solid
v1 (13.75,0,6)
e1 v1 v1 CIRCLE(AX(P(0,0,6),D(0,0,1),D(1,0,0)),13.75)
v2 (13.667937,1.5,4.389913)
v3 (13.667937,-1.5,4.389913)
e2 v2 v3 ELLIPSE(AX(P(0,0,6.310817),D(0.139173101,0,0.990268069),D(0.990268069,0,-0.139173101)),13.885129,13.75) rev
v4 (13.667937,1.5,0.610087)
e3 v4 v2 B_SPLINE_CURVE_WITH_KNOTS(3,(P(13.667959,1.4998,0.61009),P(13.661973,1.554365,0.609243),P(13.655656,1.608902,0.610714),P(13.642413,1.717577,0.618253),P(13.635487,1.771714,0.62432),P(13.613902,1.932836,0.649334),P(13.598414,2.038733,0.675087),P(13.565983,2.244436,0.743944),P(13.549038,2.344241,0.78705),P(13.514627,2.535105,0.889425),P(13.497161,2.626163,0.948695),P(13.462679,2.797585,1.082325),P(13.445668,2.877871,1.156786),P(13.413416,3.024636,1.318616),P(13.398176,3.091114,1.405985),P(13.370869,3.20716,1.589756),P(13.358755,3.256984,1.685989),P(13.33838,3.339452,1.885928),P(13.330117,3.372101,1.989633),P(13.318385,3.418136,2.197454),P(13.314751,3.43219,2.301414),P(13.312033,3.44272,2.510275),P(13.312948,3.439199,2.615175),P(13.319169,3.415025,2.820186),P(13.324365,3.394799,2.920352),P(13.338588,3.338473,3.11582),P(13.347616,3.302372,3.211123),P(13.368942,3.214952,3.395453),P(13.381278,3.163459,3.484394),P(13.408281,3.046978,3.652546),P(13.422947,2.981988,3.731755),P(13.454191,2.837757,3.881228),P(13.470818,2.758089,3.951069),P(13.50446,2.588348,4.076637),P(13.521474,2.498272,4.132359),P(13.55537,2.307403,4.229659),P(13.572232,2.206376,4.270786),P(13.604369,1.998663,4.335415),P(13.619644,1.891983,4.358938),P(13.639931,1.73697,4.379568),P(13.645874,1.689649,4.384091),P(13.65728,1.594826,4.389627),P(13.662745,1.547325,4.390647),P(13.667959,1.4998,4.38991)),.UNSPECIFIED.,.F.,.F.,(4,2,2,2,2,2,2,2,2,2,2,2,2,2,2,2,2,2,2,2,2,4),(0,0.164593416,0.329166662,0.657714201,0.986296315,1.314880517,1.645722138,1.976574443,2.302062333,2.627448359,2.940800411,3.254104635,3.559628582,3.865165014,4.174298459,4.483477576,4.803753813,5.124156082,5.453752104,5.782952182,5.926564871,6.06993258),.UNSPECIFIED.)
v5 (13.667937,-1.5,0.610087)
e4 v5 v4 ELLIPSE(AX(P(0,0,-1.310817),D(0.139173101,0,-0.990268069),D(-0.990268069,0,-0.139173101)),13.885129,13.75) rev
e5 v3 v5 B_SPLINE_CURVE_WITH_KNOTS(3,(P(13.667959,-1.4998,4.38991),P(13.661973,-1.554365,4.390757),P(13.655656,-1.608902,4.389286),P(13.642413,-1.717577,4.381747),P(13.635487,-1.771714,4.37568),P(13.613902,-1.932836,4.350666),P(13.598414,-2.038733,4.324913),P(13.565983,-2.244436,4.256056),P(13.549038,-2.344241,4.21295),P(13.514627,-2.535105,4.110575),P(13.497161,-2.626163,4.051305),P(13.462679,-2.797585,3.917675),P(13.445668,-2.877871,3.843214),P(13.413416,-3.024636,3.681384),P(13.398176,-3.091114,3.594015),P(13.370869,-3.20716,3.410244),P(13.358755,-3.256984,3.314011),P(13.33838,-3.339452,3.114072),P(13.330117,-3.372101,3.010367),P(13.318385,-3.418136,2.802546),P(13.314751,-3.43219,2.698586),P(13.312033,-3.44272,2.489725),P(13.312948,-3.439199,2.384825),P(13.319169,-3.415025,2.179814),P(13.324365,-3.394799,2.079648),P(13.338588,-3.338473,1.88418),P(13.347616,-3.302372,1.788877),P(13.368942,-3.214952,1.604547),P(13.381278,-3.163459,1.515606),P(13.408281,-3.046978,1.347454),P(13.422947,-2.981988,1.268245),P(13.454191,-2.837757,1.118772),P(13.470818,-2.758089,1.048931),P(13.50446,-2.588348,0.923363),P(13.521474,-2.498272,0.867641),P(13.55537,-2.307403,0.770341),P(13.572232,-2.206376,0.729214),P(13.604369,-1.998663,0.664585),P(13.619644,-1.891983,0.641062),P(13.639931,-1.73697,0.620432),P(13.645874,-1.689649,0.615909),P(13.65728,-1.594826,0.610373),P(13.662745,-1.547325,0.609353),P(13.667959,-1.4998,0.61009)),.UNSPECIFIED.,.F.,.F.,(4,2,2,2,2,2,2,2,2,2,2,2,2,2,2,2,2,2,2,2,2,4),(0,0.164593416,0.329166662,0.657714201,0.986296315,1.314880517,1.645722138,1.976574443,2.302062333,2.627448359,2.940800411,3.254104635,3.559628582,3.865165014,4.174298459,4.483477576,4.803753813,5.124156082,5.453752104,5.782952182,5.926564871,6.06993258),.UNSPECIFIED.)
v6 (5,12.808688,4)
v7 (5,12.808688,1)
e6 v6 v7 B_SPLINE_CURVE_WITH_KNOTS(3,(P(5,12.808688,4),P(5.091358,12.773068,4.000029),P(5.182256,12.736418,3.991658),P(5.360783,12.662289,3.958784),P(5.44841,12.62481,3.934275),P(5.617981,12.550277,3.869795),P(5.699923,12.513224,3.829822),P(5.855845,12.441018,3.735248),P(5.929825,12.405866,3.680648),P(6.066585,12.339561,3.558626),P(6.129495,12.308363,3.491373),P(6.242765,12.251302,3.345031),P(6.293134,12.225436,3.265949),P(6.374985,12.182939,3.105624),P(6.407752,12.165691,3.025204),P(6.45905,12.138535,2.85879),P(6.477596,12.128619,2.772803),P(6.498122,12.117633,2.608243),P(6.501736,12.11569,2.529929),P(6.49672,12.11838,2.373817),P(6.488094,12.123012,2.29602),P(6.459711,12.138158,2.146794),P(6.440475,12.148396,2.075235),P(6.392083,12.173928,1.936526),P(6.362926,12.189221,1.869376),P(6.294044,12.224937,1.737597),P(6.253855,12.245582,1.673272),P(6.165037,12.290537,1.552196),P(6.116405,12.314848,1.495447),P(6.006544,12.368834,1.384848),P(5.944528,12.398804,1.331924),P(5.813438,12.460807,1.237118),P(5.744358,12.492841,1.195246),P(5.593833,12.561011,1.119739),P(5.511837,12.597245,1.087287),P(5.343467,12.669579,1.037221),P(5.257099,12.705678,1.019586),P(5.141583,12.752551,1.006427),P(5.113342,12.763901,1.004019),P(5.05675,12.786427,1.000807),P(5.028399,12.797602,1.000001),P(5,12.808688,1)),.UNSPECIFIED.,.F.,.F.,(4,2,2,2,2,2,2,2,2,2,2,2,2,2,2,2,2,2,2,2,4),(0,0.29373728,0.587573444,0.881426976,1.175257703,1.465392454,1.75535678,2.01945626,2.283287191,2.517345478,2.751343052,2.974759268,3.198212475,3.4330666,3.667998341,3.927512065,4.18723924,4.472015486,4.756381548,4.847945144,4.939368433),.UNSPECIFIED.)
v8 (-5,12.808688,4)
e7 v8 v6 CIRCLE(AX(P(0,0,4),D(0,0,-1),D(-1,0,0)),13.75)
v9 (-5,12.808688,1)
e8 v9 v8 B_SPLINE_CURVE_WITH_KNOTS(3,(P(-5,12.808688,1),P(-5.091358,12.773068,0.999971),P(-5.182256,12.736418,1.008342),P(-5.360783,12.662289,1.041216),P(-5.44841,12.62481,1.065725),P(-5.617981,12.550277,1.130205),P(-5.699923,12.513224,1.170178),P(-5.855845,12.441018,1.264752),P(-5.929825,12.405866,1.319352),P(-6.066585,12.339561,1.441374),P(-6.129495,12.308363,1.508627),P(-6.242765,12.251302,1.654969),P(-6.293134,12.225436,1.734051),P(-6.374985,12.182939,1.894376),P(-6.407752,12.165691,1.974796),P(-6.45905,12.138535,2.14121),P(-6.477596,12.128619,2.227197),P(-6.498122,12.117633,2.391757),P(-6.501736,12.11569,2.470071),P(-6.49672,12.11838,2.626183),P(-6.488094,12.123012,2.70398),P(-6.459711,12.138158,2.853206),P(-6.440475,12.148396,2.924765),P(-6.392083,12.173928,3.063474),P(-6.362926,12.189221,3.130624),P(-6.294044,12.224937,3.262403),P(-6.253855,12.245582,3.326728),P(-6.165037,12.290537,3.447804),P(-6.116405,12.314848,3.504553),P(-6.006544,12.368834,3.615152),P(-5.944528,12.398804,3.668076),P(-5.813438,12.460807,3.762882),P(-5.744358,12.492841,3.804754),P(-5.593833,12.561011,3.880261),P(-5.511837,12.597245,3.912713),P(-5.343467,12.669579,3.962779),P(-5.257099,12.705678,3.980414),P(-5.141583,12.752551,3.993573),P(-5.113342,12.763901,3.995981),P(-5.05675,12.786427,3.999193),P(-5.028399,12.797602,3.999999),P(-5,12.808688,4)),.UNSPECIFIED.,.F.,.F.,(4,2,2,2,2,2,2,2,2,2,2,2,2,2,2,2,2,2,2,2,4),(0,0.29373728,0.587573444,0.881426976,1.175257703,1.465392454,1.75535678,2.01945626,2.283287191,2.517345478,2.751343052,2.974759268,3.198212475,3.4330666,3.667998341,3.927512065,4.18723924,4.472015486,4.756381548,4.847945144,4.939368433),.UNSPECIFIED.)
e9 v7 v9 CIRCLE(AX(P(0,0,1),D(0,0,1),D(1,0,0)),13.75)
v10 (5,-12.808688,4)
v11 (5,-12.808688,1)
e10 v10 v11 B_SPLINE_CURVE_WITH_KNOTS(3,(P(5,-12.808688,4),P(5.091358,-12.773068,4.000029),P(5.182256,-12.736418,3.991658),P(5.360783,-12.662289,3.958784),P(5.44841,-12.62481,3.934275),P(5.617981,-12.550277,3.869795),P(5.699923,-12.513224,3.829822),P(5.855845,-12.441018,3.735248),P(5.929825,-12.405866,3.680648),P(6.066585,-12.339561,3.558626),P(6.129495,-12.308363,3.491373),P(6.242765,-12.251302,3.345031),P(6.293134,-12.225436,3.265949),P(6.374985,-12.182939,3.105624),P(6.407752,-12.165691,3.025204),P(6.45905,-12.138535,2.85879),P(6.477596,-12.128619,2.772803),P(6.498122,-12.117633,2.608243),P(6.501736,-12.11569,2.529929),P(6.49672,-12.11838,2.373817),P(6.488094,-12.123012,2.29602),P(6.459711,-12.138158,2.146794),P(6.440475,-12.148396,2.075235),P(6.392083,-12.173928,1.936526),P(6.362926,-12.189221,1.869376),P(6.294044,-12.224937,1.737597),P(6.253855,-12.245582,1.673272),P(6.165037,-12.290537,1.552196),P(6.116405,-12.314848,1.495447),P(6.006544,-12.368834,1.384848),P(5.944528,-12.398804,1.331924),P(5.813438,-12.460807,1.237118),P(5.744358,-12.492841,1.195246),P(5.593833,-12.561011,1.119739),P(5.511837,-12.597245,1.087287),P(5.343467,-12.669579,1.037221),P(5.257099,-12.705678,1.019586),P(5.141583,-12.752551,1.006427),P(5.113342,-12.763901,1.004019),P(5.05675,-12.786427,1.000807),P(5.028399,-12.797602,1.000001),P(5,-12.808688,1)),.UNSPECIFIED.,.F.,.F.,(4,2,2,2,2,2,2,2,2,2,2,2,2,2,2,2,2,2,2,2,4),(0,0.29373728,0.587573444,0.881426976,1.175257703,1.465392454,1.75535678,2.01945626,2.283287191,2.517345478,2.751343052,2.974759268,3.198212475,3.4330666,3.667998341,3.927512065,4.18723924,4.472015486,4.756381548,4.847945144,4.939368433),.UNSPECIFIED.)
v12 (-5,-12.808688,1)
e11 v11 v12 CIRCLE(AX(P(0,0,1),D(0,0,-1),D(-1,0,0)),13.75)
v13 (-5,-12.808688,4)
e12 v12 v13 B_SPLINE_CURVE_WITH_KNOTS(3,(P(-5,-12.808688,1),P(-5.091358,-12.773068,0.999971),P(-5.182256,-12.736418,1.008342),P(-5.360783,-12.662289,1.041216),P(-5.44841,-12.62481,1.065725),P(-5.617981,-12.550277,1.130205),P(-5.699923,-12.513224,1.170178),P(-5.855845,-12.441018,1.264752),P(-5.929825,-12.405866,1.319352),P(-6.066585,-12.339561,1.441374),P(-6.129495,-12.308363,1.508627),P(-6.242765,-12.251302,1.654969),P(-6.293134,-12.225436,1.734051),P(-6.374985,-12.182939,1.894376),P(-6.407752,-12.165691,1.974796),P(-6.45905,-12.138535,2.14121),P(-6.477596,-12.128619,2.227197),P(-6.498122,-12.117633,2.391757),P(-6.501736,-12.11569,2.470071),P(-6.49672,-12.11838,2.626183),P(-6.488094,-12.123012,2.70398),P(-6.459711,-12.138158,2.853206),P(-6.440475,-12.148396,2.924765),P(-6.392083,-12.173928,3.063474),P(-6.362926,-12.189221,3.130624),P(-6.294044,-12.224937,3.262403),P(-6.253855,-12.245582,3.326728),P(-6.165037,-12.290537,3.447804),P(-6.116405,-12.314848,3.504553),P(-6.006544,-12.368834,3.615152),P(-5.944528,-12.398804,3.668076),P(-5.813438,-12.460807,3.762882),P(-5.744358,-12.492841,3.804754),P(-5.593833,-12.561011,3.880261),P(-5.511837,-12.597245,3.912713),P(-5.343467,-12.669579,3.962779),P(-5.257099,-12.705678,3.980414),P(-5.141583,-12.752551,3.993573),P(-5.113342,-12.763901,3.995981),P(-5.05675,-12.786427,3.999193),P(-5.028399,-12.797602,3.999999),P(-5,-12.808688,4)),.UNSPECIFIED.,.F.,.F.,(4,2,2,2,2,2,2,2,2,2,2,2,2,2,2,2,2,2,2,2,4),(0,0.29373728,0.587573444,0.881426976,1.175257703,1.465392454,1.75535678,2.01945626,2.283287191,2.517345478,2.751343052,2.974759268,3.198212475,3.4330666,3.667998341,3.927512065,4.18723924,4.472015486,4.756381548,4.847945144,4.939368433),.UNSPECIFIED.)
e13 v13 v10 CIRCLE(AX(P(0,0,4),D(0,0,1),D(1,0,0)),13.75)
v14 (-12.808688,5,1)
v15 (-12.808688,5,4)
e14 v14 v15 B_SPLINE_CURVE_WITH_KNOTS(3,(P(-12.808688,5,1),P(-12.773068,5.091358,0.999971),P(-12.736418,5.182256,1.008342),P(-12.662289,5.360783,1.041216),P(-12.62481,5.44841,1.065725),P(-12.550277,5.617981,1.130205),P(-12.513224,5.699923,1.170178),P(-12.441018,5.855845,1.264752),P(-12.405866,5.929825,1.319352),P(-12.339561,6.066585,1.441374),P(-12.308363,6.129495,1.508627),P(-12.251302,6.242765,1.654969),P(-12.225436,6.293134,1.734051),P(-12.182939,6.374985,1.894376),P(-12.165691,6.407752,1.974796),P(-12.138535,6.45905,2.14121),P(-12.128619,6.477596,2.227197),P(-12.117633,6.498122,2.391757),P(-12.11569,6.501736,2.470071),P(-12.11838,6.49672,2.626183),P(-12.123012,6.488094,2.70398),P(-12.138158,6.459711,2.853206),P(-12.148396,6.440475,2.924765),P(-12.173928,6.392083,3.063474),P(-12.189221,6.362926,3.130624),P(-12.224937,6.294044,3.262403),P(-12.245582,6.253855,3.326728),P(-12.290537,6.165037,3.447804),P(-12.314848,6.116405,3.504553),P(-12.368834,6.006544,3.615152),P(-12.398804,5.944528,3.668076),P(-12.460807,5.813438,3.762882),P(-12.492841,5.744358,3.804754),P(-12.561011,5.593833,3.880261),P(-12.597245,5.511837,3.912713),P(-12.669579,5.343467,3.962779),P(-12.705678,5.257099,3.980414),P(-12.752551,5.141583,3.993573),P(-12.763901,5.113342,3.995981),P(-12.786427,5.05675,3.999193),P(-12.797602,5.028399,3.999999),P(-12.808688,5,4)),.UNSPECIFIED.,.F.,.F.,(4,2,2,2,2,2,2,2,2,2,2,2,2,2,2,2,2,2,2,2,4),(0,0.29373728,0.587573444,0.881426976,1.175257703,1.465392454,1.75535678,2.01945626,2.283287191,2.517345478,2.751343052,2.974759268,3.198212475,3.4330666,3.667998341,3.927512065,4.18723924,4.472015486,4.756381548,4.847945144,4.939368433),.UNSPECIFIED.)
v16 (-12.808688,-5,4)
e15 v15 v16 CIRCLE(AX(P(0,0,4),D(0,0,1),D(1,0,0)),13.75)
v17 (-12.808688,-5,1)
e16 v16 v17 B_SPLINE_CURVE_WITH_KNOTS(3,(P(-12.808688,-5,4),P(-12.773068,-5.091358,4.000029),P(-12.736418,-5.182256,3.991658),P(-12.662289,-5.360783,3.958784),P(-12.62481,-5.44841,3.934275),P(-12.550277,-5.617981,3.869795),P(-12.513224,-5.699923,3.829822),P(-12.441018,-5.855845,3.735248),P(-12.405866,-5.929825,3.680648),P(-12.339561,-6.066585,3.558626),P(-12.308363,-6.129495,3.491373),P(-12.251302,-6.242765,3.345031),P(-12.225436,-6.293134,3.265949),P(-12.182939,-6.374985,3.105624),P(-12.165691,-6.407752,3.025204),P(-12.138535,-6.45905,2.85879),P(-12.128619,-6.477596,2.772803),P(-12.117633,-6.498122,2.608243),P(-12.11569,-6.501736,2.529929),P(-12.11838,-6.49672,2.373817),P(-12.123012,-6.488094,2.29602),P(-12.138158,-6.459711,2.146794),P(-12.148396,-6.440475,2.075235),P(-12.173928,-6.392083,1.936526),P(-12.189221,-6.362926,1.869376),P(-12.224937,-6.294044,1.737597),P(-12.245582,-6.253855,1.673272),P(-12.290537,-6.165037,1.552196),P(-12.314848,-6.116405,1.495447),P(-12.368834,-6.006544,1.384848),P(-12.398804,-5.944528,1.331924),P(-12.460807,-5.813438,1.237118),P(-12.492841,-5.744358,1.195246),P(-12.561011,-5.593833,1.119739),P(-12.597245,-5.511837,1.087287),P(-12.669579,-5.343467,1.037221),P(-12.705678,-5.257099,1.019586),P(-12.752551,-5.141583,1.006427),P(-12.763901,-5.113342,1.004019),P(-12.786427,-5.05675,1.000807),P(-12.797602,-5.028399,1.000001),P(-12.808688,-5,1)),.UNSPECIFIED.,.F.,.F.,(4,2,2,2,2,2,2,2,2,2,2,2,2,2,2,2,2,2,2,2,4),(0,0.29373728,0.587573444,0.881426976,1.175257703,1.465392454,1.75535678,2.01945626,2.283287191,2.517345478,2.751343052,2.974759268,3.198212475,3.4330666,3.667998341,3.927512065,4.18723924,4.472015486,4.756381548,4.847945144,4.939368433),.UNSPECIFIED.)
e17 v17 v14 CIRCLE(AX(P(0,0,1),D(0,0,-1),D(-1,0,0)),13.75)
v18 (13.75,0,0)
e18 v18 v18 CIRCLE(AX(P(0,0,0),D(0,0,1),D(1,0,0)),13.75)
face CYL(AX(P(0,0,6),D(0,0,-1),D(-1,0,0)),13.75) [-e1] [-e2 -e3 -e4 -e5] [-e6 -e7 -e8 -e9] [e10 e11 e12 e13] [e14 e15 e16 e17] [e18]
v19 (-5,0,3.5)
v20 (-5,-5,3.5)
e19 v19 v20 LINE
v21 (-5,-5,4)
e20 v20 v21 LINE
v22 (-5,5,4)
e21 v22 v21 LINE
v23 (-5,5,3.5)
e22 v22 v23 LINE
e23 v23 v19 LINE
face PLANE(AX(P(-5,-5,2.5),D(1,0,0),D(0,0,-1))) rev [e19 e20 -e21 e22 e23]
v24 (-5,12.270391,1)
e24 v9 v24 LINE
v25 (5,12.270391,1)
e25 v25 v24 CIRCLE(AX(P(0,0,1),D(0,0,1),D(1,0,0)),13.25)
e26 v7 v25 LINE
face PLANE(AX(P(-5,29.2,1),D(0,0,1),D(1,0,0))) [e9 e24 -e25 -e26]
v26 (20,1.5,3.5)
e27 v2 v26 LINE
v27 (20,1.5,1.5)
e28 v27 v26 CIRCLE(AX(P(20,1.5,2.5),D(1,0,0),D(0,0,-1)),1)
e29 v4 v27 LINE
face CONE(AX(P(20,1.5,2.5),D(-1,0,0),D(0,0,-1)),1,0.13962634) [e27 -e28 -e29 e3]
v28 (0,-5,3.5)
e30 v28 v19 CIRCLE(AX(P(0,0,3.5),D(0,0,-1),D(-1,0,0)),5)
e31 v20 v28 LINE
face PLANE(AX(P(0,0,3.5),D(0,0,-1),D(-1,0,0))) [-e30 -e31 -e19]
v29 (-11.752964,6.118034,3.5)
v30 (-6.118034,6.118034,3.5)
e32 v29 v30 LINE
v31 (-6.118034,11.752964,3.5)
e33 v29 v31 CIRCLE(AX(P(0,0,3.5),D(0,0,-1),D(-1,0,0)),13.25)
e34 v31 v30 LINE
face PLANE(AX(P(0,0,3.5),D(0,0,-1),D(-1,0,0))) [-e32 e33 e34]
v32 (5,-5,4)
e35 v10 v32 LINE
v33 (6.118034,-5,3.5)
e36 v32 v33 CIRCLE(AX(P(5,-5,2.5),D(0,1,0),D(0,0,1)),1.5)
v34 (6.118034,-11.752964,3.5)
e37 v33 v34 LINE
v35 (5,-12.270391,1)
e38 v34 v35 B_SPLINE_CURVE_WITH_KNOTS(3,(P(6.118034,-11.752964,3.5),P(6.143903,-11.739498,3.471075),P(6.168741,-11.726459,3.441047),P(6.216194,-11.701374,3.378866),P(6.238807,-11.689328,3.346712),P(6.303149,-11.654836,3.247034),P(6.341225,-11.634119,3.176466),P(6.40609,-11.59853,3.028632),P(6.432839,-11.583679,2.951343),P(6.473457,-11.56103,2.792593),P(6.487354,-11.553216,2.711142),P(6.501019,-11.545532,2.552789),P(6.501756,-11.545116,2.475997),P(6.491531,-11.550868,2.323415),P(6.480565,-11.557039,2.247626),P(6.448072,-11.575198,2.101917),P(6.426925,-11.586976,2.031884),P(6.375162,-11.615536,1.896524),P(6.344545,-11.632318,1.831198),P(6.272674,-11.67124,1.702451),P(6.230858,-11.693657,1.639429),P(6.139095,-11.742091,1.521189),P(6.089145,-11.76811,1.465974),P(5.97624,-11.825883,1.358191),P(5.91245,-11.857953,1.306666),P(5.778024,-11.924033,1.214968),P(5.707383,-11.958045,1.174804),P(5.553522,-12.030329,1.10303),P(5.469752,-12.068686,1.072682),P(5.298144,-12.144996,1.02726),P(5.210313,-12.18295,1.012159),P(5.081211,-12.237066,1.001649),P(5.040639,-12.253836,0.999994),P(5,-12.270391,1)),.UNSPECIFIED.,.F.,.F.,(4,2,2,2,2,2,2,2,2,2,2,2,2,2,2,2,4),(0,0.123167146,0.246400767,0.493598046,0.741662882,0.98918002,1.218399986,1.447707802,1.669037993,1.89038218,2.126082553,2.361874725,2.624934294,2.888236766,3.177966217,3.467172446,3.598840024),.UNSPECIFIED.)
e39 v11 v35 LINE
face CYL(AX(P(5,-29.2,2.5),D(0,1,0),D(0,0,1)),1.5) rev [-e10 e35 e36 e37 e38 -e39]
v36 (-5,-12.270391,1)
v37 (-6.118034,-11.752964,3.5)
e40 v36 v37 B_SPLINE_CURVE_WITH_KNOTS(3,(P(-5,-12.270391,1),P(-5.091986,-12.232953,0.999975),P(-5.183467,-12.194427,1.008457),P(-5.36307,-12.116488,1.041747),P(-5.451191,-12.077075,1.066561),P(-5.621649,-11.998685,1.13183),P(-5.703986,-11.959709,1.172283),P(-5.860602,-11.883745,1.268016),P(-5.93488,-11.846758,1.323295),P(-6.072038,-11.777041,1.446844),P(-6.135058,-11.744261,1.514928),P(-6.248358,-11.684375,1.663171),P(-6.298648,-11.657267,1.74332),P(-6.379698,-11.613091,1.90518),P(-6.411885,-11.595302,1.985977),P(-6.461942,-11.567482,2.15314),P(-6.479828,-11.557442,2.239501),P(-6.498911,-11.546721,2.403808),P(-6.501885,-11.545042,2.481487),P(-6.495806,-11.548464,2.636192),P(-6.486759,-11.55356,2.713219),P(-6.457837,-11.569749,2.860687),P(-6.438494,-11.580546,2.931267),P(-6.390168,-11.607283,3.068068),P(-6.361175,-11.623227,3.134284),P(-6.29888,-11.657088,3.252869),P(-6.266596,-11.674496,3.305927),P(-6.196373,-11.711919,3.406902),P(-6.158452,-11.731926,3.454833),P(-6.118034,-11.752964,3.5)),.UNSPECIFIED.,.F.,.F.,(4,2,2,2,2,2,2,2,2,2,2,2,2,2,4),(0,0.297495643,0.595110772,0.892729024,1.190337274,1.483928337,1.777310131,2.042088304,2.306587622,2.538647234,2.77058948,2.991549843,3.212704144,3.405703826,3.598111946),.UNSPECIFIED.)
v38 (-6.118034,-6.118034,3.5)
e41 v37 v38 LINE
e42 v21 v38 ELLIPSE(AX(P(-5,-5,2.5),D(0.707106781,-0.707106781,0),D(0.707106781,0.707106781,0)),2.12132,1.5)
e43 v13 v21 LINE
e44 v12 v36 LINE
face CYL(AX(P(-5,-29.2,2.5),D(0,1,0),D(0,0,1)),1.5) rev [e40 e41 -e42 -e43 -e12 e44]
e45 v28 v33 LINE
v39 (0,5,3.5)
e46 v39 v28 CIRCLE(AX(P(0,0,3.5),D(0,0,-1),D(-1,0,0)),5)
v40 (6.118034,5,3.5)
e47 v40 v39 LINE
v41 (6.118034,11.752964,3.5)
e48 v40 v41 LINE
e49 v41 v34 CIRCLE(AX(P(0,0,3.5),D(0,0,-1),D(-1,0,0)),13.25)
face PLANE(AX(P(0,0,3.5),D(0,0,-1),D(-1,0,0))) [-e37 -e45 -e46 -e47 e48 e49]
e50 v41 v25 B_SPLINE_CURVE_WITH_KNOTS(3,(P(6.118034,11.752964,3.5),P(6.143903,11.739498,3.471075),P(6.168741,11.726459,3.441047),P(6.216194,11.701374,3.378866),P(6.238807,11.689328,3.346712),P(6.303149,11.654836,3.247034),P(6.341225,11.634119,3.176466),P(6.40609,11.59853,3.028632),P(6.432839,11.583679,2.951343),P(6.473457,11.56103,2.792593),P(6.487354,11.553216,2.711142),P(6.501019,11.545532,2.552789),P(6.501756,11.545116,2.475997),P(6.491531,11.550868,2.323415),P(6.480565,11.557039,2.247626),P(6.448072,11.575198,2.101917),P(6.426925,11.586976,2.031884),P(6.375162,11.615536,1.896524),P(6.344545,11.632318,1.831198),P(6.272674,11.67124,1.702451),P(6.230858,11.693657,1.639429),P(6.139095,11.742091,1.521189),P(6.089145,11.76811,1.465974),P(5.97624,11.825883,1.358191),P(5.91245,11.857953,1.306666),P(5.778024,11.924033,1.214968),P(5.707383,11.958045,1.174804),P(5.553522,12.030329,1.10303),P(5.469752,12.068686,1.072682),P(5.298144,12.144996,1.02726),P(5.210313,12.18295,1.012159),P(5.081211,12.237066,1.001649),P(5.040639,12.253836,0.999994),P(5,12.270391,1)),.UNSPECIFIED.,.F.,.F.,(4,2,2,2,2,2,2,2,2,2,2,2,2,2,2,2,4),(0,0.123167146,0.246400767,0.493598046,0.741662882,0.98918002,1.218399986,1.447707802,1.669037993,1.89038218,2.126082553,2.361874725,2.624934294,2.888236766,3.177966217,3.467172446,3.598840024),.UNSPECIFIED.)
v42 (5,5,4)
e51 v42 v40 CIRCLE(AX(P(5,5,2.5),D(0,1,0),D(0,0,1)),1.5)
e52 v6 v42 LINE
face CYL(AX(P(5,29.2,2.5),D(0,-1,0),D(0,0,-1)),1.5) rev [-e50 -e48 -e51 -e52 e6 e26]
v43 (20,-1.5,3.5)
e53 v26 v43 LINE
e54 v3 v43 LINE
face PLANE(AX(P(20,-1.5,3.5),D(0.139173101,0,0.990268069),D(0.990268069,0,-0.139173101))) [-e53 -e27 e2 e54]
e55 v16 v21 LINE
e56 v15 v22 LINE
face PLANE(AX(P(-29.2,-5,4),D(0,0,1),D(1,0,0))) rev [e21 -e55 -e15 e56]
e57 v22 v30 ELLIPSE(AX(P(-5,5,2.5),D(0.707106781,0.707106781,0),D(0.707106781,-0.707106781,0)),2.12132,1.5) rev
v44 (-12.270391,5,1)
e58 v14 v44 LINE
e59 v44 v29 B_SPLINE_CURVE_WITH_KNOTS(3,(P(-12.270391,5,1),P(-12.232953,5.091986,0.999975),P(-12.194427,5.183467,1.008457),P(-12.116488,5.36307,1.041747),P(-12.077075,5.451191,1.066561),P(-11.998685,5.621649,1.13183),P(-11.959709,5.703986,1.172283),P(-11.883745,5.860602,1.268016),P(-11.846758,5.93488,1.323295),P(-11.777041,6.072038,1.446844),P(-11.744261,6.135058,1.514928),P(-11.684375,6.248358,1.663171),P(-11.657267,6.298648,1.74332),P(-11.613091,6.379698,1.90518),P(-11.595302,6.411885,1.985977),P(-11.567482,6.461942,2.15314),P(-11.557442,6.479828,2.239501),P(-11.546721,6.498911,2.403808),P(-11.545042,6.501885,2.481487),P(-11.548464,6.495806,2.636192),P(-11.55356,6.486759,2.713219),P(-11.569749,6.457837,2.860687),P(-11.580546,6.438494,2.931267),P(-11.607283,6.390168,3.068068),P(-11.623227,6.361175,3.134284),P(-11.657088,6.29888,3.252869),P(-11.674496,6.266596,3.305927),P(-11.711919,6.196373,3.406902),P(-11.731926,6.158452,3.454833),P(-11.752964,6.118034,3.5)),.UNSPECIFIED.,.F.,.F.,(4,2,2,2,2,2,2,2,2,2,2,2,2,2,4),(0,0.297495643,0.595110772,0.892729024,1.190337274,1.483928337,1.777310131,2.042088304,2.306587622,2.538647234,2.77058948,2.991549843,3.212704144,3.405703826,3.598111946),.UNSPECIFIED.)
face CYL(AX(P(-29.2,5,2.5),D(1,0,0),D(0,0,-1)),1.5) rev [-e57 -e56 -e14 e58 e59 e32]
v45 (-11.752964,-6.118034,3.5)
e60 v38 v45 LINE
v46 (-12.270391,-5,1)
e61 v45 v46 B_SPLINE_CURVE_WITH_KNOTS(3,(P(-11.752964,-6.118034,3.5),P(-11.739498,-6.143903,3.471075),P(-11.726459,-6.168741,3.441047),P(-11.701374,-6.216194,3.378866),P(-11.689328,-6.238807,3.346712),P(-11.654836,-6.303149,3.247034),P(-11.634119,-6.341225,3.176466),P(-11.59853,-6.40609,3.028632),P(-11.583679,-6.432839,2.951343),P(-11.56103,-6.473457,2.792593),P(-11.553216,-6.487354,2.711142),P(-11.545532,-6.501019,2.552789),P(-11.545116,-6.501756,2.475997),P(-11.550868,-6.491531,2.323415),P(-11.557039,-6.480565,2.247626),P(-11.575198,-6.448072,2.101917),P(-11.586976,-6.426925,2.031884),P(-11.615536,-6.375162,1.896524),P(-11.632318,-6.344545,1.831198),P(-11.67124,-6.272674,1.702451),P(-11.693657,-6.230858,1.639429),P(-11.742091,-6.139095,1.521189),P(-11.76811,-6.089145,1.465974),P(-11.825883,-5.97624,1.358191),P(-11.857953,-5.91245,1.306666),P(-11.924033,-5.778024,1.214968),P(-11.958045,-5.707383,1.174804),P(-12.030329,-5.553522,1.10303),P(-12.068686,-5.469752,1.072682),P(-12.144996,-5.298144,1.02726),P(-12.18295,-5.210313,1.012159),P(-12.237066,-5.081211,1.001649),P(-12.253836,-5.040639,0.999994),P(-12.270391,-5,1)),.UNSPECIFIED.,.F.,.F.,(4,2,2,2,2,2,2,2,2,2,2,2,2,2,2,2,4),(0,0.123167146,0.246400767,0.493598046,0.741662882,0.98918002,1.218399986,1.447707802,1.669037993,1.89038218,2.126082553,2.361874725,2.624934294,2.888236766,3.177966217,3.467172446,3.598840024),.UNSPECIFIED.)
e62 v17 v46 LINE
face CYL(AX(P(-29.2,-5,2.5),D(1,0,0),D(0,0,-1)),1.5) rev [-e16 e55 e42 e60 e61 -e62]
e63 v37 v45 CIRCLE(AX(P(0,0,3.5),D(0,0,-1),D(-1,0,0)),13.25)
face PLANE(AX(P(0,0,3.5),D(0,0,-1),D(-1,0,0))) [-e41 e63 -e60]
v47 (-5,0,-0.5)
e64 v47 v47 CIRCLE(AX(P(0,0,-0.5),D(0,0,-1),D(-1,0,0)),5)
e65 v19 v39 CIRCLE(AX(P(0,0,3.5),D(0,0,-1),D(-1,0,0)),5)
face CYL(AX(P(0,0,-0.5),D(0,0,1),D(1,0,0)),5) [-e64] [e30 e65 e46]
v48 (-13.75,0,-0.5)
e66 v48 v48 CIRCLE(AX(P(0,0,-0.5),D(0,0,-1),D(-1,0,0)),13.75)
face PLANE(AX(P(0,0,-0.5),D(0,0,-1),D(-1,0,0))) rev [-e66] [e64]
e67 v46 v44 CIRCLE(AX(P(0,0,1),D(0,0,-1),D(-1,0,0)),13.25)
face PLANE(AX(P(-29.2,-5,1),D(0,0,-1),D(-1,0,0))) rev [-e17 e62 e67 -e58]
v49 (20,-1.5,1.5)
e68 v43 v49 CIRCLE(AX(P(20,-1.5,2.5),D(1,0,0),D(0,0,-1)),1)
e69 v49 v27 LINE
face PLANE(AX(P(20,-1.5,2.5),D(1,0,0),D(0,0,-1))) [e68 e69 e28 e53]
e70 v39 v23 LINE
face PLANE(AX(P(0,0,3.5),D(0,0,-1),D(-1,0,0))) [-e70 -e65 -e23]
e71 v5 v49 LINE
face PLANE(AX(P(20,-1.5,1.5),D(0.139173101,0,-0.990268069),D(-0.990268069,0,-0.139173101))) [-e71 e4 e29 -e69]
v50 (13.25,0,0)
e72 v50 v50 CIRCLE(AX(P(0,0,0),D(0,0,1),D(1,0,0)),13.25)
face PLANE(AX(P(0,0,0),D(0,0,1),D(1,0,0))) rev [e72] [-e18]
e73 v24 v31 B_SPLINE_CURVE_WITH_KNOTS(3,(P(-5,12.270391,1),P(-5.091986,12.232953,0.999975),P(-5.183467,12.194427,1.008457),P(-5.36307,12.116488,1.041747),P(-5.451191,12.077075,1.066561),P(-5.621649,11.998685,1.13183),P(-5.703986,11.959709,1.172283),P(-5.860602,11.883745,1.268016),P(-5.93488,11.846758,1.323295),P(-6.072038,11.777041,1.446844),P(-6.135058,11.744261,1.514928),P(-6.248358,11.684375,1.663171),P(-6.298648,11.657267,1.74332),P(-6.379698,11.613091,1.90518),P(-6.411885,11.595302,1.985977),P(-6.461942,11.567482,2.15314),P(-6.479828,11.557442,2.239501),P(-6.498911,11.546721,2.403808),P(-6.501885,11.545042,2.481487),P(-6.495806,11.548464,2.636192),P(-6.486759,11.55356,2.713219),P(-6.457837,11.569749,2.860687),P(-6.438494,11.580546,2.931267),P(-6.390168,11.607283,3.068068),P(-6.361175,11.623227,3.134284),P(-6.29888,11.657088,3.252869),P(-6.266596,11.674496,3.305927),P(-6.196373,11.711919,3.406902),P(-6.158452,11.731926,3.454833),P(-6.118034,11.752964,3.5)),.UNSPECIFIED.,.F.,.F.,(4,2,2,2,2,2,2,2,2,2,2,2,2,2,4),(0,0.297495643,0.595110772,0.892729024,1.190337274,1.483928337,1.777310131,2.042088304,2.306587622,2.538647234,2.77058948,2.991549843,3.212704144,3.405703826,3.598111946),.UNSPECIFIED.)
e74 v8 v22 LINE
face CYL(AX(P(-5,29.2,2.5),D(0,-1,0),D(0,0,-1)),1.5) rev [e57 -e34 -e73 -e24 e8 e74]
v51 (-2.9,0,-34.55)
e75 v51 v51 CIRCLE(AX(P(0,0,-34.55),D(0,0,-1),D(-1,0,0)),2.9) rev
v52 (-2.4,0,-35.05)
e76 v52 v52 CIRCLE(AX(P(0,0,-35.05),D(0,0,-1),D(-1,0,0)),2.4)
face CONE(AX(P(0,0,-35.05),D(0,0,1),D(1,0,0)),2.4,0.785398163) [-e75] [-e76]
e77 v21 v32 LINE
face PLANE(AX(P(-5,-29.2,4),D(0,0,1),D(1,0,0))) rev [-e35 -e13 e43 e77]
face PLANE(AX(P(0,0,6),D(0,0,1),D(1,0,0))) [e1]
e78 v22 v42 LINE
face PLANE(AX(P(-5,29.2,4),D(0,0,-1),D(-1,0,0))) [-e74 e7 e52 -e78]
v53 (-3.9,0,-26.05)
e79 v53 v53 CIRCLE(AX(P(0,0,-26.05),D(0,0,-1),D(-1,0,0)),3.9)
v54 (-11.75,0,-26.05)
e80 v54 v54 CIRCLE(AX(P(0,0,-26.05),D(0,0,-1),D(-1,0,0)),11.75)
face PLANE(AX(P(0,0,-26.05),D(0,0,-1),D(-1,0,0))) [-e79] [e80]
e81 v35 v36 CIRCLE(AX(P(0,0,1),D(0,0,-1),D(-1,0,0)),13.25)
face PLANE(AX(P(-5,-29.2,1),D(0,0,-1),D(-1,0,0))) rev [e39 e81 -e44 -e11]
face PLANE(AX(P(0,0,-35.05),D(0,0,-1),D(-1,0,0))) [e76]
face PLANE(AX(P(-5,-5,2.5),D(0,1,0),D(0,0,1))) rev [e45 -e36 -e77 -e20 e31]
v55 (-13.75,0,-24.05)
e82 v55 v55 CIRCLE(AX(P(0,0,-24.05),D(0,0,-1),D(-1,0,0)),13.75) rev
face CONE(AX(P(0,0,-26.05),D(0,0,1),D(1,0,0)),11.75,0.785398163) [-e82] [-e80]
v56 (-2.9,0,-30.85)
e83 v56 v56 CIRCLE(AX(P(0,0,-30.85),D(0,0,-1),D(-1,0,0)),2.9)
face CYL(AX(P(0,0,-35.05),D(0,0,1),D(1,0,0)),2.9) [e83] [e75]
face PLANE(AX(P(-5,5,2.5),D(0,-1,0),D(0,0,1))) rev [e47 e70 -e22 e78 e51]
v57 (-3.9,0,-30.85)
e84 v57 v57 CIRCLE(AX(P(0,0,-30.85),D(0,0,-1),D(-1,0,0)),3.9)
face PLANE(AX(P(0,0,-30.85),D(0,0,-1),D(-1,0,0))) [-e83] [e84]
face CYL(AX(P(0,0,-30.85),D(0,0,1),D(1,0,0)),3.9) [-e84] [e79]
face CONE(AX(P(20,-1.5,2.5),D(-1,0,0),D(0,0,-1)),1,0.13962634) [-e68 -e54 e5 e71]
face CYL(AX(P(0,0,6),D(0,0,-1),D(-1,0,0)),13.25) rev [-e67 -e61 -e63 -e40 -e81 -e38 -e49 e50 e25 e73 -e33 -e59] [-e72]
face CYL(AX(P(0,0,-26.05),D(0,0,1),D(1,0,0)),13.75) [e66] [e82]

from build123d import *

# Parameters (mm, degrees)
SKETCH1_R           = 13.75
BOSS_EXTRUDE1_DEPTH = 6
SHELL1_T            = -0.5
SKETCH3_R           = 5
BOSS_EXTRUDE2_DEPTH = 6
BOSS_EXTRUDE7_START = 2
SKETCH10_R          = 13.25
BOSS_EXTRUDE7_DEPTH = 2
BOSS_EXTRUDE3_START = 25.55
SKETCH4_R           = 13.75
BOSS_EXTRUDE3_DEPTH = 25.55
CHAMFER1_SIZE       = 2
SKETCH5_R           = 3.9
BOSS_EXTRUDE4_DEPTH = 4.8
SKETCH6_R           = 2.9
BOSS_EXTRUDE5_DEPTH = 4.2
CHAMFER2_SIZE       = 0.5
CUT_EXTRUDE1_START  = -5
CUT_EXTRUDE1_DEPTH  = 24.2
CUT_EXTRUDE2_START  = -5
CUT_EXTRUDE2_DEPTH  = 24.2
BOSS_EXTRUDE8_DEPTH = 6.687218579
BOSS_EXTRUDE8_DRAFT = 8


# Read off the part's stored shape, not the designer's step: Boss-Extrude8
with BuildPart() as part:
    # Sketch1 → Boss-Extrude1 (new body)
    with BuildSketch(Plane.XY):
        Circle(SKETCH1_R)
    extrude(amount=BOSS_EXTRUDE1_DEPTH)

    # Shell1
    shell1_openings = [part.faces().sort_by_distance(p)[0] for p in [
        (0, 0, 0),
    ]]
    offset(amount=SHELL1_T, openings=shell1_openings, kind=Kind.INTERSECTION)

    # Sketch3 → Boss-Extrude2 (add)
    with BuildSketch(Plane(origin=(0, 0, 5.5), x_dir=(-1, 0, 0), z_dir=(0, 0, -1))):
        with Locations(Location((0, 0, 0), (0, 0, 180))):
            Circle(SKETCH3_R)
    extrude(amount=BOSS_EXTRUDE2_DEPTH)

    # Sketch10 → Boss-Extrude7 (add)
    with BuildSketch(Plane(origin=(0, 0, 5.5), x_dir=(-1, 0, 0), z_dir=(0, 0, -1)).offset(BOSS_EXTRUDE7_START)):
        Circle(SKETCH10_R)
    extrude(amount=-BOSS_EXTRUDE7_DEPTH)

    # Sketch4 → Boss-Extrude3 (add)
    with BuildSketch(Plane(origin=(0, 0, -0.5), x_dir=(-1, 0, 0), z_dir=(0, 0, -1)).offset(BOSS_EXTRUDE3_START)):
        with Locations(Location((0, 0, 0), (0, 0, 180))):
            Circle(SKETCH4_R)
    extrude(amount=-BOSS_EXTRUDE3_DEPTH)

    # Chamfer1
    chamfer1_edges = [part.edges().sort_by_distance(p)[0] for p in [
        (-13.75, 0, -26.05),
    ]]
    chamfer(chamfer1_edges, length=CHAMFER1_SIZE)

    # Sketch5 → Boss-Extrude4 (add)
    with BuildSketch(Plane(origin=(0, 0, -26.05), x_dir=(-1, 0, 0), z_dir=(0, 0, -1))):
        Circle(SKETCH5_R)
    extrude(amount=BOSS_EXTRUDE4_DEPTH)

    # Sketch6 → Boss-Extrude5 (add)
    with BuildSketch(Plane(origin=(0, 0, -30.85), x_dir=(-1, 0, 0), z_dir=(0, 0, -1))):
        Circle(SKETCH6_R)
    extrude(amount=BOSS_EXTRUDE5_DEPTH)

    # Chamfer2
    chamfer2_edges = [part.edges().sort_by_distance(p)[0] for p in [
        (2.9, 0, -35.05),
    ]]
    chamfer(chamfer2_edges, length=CHAMFER2_SIZE)

    # Sketch7 → Cut-Extrude1 (cut)
    with BuildSketch(Plane(origin=(0, 0, 0), x_dir=(0, 0, -1), z_dir=(1, 0, 0)).offset(CUT_EXTRUDE1_START)):
        with BuildLine():
            Line((-4, -5), (-4, 5))
            ThreePointArc((-4, 5), (-2.5, 6.5), (-1, 5))
            Line((-1, 5), (-1, -5))
            ThreePointArc((-1, -5), (-2.5, -6.5), (-4, -5))
        make_face()
    extrude(amount=-CUT_EXTRUDE1_DEPTH, mode=Mode.SUBTRACT)

    # Sketch8 → Cut-Extrude2 (cut)
    with BuildSketch(Plane(origin=(0, 0, 0), x_dir=(1, 0, 0), z_dir=(0, 1, 0)).offset(CUT_EXTRUDE2_START)):
        with BuildLine():
            Line((-5, -1), (5, -1))
            ThreePointArc((5, -1), (6.5, -2.5), (5, -4))
            Line((5, -4), (-5, -4))
            ThreePointArc((-5, -4), (-6.5, -2.5), (-5, -1))
        make_face()
    cut_extrude2 = extrude(amount=-CUT_EXTRUDE2_DEPTH, mode=Mode.SUBTRACT)

    # Mirror1: Cut-Extrude2 across plane
    add(cut_extrude2.mirror(Plane.ZX), mode=Mode.SUBTRACT)


with BuildPart() as boss_extrude8_tool:
    # Boss-Extrude8 outline → Boss-Extrude8 (with draft: the straight prism first)
    with BuildSketch(Plane(origin=(20, 0, 0), x_dir=(0, 0, -1), z_dir=(1, 0, 0))):
        with BuildLine():
            ThreePointArc((-3.5, -1.5), (-2.5, -2.5), (-1.5, -1.5))
            Line((-1.5, -1.5), (-1.5, 1.5))
            ThreePointArc((-1.5, 1.5), (-2.5, 2.5), (-3.5, 1.5))
            Line((-3.5, 1.5), (-3.5, -1.5))
        make_face()
    extrude(amount=-BOSS_EXTRUDE8_DEPTH)
    # Boss-Extrude8: the draft: its side faces are tilted about the plane it starts from
    boss_extrude8_sides = [boss_extrude8_tool.faces().sort_by_distance(p)[0] for p in [
        (16.656390711, 0, 3.5),
        (16.65639071, -2.5, 2.5),
        (16.656390711, 0, 1.5),
        (16.65639071, 2.5, 2.5),
    ]]
    draft(boss_extrude8_sides, Plane(origin=(20, 0, 0), x_dir=(0, 0, -1), z_dir=(1, 0, 0)), BOSS_EXTRUDE8_DRAFT)


with BuildPart() as part_1:
    add(part.part)

    # Boss-Extrude8: add boss_extrude8_tool
    add(boss_extrude8_tool.part)


solid = part_1.part
